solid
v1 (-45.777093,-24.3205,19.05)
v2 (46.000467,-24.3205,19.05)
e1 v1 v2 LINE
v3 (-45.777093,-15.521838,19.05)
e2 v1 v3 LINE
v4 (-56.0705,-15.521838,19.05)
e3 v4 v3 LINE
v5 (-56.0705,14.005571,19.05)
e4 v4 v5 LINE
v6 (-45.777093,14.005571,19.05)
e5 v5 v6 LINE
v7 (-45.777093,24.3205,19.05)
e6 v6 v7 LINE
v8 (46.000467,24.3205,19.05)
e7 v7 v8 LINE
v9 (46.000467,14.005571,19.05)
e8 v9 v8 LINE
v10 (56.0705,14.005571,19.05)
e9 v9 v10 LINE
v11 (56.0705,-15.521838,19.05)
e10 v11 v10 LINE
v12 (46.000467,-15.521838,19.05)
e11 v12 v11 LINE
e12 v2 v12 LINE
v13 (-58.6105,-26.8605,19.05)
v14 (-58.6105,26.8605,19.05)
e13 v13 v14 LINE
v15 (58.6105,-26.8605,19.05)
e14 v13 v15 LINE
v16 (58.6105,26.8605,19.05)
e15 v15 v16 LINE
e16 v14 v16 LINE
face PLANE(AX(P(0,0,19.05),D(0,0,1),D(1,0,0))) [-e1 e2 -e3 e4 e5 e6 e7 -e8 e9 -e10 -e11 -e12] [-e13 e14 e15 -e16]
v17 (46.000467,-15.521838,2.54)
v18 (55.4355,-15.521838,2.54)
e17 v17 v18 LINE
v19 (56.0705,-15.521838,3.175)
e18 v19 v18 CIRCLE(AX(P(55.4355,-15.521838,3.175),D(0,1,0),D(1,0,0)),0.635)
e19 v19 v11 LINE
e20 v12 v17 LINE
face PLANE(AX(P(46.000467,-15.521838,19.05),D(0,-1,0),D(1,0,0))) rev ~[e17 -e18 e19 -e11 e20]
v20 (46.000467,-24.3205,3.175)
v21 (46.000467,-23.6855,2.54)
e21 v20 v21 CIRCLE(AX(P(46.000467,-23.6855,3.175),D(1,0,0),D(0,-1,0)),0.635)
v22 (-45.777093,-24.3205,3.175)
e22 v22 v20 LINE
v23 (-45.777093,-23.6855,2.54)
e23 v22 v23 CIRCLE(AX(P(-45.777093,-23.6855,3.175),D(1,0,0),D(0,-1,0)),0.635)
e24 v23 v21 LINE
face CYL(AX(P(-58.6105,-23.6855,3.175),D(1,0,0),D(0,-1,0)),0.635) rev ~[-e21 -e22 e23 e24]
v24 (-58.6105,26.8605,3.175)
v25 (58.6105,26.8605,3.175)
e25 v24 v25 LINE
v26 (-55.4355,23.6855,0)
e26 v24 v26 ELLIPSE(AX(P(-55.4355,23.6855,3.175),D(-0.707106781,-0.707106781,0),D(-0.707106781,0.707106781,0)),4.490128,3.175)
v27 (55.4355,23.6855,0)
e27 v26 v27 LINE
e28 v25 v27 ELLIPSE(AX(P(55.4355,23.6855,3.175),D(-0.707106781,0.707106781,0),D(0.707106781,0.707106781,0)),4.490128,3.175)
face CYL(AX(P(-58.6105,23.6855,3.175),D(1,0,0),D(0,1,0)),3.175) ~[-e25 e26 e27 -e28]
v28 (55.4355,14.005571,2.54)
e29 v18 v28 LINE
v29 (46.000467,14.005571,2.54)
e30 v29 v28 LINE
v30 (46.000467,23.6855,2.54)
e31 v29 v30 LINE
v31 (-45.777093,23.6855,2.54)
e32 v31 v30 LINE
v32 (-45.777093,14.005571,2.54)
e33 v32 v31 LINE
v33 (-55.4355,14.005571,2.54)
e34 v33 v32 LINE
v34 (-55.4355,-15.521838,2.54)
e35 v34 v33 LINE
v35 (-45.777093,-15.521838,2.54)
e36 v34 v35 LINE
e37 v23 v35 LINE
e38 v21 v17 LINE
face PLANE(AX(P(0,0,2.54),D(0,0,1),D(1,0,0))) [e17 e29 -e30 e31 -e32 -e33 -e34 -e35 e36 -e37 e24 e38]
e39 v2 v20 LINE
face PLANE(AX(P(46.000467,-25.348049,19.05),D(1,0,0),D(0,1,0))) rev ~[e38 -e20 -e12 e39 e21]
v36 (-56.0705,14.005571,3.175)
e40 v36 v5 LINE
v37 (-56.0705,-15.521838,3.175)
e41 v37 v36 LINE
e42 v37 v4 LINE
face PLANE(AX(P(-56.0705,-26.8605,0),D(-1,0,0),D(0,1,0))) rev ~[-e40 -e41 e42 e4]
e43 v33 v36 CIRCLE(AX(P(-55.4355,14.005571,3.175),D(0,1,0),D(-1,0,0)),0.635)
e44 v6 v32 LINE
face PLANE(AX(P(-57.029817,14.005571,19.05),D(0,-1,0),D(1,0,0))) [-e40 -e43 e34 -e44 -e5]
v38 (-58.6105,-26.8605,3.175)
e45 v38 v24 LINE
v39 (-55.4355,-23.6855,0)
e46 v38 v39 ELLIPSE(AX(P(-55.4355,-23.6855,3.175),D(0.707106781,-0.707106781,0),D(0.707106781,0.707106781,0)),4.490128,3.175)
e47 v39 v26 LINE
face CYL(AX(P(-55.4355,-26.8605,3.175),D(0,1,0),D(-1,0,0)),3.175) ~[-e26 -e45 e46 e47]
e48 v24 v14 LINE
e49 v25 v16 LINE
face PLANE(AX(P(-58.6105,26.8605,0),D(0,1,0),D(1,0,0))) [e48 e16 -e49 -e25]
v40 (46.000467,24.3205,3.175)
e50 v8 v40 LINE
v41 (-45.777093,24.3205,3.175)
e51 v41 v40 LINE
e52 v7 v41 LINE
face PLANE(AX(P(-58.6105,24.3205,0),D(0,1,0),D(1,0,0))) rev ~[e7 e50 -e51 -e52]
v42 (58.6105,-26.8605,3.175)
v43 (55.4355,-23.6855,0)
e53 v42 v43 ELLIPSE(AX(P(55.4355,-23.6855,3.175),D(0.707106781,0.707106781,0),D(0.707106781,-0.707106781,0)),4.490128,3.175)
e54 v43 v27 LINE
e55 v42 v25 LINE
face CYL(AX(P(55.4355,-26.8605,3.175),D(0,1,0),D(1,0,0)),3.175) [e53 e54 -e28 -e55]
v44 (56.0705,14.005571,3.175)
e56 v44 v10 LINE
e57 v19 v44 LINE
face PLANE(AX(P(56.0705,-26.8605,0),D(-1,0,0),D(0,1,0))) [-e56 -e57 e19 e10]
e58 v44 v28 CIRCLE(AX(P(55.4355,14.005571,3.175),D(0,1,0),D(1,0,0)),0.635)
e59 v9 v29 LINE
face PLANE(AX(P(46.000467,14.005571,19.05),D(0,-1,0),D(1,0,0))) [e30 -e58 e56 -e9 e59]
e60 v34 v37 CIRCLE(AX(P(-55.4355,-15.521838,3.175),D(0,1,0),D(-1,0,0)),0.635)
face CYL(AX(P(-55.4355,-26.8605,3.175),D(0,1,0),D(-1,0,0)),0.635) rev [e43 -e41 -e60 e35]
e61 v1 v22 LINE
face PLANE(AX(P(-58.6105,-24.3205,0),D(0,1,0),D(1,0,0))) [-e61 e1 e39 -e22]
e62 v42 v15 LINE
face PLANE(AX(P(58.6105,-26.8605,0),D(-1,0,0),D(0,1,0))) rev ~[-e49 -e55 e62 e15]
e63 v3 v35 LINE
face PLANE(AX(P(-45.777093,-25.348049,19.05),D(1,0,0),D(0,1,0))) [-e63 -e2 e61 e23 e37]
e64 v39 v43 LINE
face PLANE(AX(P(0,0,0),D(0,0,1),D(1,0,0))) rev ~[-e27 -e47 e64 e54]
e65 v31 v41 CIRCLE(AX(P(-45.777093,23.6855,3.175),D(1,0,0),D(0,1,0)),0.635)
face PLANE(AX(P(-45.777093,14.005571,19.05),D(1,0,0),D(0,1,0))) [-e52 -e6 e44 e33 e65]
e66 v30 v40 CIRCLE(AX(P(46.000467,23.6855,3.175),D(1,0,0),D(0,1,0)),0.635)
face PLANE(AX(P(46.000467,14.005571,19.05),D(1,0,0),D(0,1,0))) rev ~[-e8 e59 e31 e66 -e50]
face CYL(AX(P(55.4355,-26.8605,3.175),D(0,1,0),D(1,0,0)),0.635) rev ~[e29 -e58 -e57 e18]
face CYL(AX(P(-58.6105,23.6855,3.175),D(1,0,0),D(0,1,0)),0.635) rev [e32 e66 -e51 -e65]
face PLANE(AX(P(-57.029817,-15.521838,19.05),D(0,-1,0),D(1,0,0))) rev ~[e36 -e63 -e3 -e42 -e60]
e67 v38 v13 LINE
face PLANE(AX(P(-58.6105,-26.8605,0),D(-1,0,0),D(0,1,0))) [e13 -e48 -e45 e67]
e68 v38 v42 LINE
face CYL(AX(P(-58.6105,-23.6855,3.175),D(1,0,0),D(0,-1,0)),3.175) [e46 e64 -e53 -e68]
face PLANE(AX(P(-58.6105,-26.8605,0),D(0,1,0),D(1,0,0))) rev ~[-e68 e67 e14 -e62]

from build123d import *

# Parameters (mm, degrees)
F0_W     = 117.221
F0_H     = 53.721
F1_DEPTH = 19.05
F2_R     = 3.175
F3_T     = -2.54
F5_W     = 11.2527239306
F5_H     = 9.8262102796
F5_W_2   = 11.6953600091
F5_H_2   = 12.192
F6_DEPTH = 17.78


# Not quite as in the source:
# - a feature names something its author has since deleted; it is built from what else it names


with BuildPart() as f1:
    # F0 (on Top) → F1 (new body)
    with BuildSketch(Plane.XY):
        Rectangle(F0_W, F0_H)
    extrude(amount=F1_DEPTH)

    # F2
    f2_edges = [f1.edges().sort_by_distance(p)[0] for p in [
        (0, -26.8605, 0),
        (-58.6105, 0, 0),
        (0, 26.8605, 0),
        (58.6105, 0, 0),
    ]]
    fillet(f2_edges, radius=F2_R)

    # F3
    f3_openings = [f1.faces().sort_by_distance(p)[0] for p in [
        (0, 0, 19.05),
    ]]
    offset(amount=F3_T, openings=f3_openings)

    # F5 (on offset) → F6 (join)
    with BuildSketch(Plane.XY.offset(19.05)):
        with Locations((-51.4034552881, -20.4349435174)):
            Rectangle(F5_W, F5_H)
        with Locations((51.8481470752, 20.1015706725)):
            Rectangle(F5_W_2, F5_H_2)
        with Locations((-51.4034552881, 20.1015706725)):
            Rectangle(F5_W, F5_H_2)
        with Locations((51.8481470752, -20.4349435174)):
            Rectangle(F5_W_2, F5_H)
    extrude(amount=-F6_DEPTH)


solid = f1.part
